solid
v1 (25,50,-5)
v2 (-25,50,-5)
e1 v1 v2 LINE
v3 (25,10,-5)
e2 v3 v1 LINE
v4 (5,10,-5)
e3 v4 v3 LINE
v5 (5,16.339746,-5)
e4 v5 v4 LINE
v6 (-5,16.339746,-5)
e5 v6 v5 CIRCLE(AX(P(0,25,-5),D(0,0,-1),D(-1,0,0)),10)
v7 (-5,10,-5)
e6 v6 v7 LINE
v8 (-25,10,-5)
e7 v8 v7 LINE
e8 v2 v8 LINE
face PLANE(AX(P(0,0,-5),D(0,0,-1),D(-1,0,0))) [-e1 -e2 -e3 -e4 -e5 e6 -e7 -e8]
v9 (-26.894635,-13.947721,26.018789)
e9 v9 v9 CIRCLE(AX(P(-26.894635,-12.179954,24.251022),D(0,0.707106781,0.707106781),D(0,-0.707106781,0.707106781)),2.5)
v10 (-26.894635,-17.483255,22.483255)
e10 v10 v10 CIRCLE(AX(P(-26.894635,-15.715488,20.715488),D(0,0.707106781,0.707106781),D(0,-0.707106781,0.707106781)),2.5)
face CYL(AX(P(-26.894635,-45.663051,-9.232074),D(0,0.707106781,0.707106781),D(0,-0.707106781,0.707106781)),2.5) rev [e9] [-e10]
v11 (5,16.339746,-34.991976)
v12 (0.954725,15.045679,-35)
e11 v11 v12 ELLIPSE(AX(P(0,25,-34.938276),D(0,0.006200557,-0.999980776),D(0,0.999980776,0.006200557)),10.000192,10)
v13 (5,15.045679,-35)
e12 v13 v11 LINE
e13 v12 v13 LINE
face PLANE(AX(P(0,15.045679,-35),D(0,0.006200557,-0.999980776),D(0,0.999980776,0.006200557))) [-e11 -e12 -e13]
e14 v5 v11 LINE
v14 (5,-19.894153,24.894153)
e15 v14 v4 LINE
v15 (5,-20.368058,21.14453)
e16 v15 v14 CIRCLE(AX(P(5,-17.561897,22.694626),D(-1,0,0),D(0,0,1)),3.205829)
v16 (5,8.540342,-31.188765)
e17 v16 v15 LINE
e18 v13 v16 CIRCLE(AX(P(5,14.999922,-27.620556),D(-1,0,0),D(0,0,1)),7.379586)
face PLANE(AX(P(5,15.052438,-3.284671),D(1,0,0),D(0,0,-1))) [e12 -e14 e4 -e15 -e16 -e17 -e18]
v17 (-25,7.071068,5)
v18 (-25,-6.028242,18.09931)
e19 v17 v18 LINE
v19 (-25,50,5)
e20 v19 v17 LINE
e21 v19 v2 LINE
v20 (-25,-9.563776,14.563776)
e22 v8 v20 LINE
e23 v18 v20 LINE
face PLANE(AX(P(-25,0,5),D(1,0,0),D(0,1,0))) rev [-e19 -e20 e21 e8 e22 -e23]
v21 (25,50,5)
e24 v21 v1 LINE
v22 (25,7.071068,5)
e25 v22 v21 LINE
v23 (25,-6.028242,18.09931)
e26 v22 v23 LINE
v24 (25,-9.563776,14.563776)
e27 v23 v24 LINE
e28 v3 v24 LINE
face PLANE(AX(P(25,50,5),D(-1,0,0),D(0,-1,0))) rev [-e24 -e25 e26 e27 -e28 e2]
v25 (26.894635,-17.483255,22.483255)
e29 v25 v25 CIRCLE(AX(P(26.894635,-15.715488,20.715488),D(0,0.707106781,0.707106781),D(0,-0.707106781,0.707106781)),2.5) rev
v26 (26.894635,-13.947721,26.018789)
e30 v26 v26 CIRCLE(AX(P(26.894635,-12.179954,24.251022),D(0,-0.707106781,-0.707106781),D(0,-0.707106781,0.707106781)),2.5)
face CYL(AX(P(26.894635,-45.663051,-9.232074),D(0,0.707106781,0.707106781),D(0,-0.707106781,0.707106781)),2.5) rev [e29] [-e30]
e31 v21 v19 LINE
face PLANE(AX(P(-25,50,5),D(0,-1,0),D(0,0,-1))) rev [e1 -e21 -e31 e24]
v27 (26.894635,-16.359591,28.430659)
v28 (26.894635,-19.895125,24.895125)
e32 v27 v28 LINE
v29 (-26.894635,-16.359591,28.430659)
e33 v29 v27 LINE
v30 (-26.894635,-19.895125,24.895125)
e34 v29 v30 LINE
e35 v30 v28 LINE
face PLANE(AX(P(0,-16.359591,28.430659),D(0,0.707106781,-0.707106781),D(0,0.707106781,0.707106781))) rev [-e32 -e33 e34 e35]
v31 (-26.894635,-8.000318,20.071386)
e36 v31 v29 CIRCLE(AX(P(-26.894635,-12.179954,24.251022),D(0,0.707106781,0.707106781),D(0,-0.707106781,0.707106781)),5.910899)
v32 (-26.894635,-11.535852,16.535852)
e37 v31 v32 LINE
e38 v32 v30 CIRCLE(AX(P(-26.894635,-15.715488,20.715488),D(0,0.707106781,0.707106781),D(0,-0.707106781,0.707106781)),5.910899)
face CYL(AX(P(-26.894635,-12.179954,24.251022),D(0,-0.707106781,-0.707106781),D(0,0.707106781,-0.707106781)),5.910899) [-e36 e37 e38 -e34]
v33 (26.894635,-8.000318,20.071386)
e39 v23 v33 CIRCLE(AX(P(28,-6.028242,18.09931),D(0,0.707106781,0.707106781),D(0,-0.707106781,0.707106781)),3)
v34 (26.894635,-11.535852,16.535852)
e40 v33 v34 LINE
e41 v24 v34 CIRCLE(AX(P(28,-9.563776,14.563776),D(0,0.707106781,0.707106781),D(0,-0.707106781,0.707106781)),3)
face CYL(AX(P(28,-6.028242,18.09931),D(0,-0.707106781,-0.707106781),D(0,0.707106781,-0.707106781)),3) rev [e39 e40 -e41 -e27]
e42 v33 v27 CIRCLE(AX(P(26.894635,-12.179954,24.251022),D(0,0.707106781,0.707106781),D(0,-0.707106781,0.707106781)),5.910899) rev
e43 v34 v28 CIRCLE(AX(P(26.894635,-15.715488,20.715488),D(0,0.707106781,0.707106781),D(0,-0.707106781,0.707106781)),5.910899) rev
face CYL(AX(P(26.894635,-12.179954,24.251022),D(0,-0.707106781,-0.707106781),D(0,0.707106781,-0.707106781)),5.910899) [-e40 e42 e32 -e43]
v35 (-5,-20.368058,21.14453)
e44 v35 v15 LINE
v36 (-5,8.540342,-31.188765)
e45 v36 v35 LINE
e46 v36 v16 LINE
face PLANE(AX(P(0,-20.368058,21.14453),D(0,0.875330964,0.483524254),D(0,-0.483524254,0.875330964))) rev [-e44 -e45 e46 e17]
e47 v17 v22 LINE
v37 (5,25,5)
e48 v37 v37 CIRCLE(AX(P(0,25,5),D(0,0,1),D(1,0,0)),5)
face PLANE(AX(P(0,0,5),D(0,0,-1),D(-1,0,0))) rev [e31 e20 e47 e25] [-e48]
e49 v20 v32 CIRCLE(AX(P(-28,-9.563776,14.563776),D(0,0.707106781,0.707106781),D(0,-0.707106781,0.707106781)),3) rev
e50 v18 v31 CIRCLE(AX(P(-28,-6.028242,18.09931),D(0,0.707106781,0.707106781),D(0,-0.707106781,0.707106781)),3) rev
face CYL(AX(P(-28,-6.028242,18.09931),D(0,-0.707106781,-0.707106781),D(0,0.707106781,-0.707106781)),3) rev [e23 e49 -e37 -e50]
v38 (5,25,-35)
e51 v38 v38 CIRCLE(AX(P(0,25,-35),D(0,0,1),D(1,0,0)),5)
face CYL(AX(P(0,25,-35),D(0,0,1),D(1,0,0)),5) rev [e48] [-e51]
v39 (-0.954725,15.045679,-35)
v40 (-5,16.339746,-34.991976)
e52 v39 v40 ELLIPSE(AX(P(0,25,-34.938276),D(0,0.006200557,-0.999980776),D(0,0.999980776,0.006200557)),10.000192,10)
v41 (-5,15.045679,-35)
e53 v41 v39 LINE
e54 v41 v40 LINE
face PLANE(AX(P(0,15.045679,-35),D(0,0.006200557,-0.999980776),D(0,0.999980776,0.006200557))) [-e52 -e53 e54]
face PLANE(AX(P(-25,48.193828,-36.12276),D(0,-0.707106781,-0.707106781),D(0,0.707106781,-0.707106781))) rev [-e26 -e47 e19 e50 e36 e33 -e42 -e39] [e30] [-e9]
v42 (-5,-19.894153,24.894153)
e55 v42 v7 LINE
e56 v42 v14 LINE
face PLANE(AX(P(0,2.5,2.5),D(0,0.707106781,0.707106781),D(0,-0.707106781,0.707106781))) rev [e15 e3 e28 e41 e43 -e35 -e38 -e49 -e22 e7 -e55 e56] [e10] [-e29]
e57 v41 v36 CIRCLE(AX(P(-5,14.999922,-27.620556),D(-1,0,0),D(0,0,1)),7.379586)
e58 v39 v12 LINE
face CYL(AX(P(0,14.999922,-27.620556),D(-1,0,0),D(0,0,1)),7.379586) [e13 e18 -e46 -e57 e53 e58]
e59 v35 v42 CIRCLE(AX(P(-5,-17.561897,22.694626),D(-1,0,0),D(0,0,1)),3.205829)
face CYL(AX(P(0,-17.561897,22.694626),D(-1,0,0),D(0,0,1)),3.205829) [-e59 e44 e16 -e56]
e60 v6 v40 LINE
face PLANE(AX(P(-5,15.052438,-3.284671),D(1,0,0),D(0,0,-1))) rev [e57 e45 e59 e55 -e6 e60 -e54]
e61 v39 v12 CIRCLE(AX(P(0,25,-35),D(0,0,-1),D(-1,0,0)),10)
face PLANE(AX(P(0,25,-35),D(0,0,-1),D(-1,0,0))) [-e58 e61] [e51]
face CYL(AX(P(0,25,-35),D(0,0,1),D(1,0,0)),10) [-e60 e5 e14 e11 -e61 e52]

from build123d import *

# Parameters (mm, degrees)
SCHIZZO1_W                   = 50
SCHIZZO1_H                   = 50
ESTRUSIONE_ESTRUSIONE1_DEPTH = 5
SCHIZZO2_R                   = 10
ESTRUSIONE_ESTRUSIONE2_DEPTH = 30
SCHIZZO3_R                   = 5
TAGLIO_ESTRUSIONE1_DEPTH     = 69.738635424
ESTRUSIONE_ESTRUSIONE6_DEPTH = 5
ESTRUSIONE_ESTRUSIONE7_REACH = 74.379
SCHIZZO9_W                   = 50
SCHIZZO9_H                   = 5
TAGLIO_ESTRUSIONE4_DEPTH     = 85.062355977
SCHIZZO12_R                  = 2.5
TAGLIO_ESTRUSIONE5_DEPTH     = 69.505418355
NERVATURA14_START            = -5
NERVATURA14_DEPTH            = 10


with BuildPart() as part:
    # Schizzo1 → Estrusione-Estrusione1 (new, symmetric)
    with BuildSketch(Plane.XY):
        with Locations((0, 25)):
            Rectangle(SCHIZZO1_W, SCHIZZO1_H)
    extrude(amount=ESTRUSIONE_ESTRUSIONE1_DEPTH, both=True)

    # Schizzo2 → Estrusione-Estrusione2 (add)
    with BuildSketch(Plane(origin=(0, 0, -5), x_dir=(-1, 0, 0), z_dir=(0, 0, -1))):
        with Locations((0, 25)):
            Circle(SCHIZZO2_R)
    extrude(amount=ESTRUSIONE_ESTRUSIONE2_DEPTH)

    # Schizzo3 → Taglio-Estrusione1 (cut, through all)
    with BuildSketch(Plane.XY.offset(5)):
        with Locations((0, 25)):
            Circle(SCHIZZO3_R)
    extrude(amount=-TAGLIO_ESTRUSIONE1_DEPTH, mode=Mode.SUBTRACT)

    # Estrusione-Estrusione7: up to this face of the body (flat: up to its plane)
    estrusione_estrusione7_end = Plane(part.part.faces().sort_by_distance((-24.292893219, 25, 5))[0])
    # Schizzo9 → Estrusione-Estrusione7 (add, up to the picked face)
    with BuildSketch(Plane(origin=(0, -2.5, 2.5), x_dir=(1, 0, 0), z_dir=(0, 0.7071067811865465, -0.7071067811865487)), mode=Mode.PRIVATE) as estrusione_estrusione7_sk1:
        with Locations((0, -6.035533906)):
            Rectangle(SCHIZZO9_W, SCHIZZO9_H)
    estrusione_estrusione7_tool1 = split(extrude(estrusione_estrusione7_sk1.sketch, amount=ESTRUSIONE_ESTRUSIONE7_REACH, mode=Mode.PRIVATE), bisect_by=estrusione_estrusione7_end, keep=Keep.BOTH, mode=Mode.PRIVATE)


with BuildPart() as body_2:
    # Schizzo4 → Estrusione-Estrusione6 (new body)
    with BuildSketch(Plane(origin=(0, 2.5, 2.5), x_dir=(1, 0, 0), z_dir=(0, 0.7071067811865488, 0.7071067811865464))):
        with BuildLine():
            ThreePointArc((-26.89463486, -19.849691999), (-32.805533406, -25.760590545), (-26.89463486, -31.67148909))
            Line((-26.89463486, -31.67148909), (0, -31.67148909))
            Line((0, -31.67148909), (0, -3.535533906))
            Line((0, -3.535533906), (-25, -3.535533906))
            Line((-25, -3.535533906), (-25, -17.060755301))
            ThreePointArc((-25, -17.060755301), (-25.518458602, -18.746564391), (-26.89463486, -19.849691999))
        make_face()
        with BuildLine():
            Line((0, -3.535533906), (0, -31.67148909))
            Line((0, -31.67148909), (26.89463486, -31.67148909))
            ThreePointArc((26.89463486, -31.67148909), (32.805533406, -25.760590545), (26.89463486, -19.849691999))
            ThreePointArc((26.89463486, -19.849691999), (25.518458602, -18.746564391), (25, -17.060755301))
            Line((25, -17.060755301), (25, -3.535533906))
            Line((25, -3.535533906), (0, -3.535533906))
        make_face()
    extrude(amount=ESTRUSIONE_ESTRUSIONE6_DEPTH)


with BuildPart() as part_1:
    add(part.part)

    add(body_2.part)  # Estrusione-Estrusione7 merges body 2
    add(estrusione_estrusione7_tool1.solids().sort_by(Axis((0, 1.767767, 6.767767), (0, 0.7071067811865465, -0.7071067811865487)))[0])

    # Schizzo11 → Taglio-Estrusione4 (cut, through all)
    with BuildSketch(Plane.ZY.offset(25)):
        Polygon((5, 0), (-5, 0), (-5, 10), align=None)
    extrude(amount=-TAGLIO_ESTRUSIONE4_DEPTH, mode=Mode.SUBTRACT)

    # Schizzo12 → Taglio-Estrusione5 (cut, through all)
    with BuildSketch(Plane(origin=(0, 6.035533906, 6.035533906), x_dir=(1, 0, 0), z_dir=(0, 0.7071067811865486, 0.7071067811865465))):
        with Locations(Location((-26.89463486, -25.760590545, 0), (0, 0, 270))):
            Circle(SCHIZZO12_R)
    taglio_estrusione5 = extrude(amount=-TAGLIO_ESTRUSIONE5_DEPTH, mode=Mode.SUBTRACT)

    # Specchia9: Taglio-Estrusione5 across plane
    add(taglio_estrusione5.mirror(Plane(origin=(0, 0, 0), x_dir=(0, 0, 1), z_dir=(1, 0, 0))), mode=Mode.SUBTRACT)

    # Nervatura14: read off the stored shape, not the designer's step
    # Nervatura14 outline → Nervatura14 (add)
    with BuildSketch(Plane(origin=(0, 0, 0), x_dir=(0, 0, -1), z_dir=(1, 0, 0)).offset(NERVATURA14_START)):
        with BuildLine():
            Line((35, 15.045679329), (34.991975911, 16.339745962))
            Line((34.991975911, 16.339745962), (5, 16.339745962))
            Line((5, 16.339745962), (5, 10))
            Line((5, 10), (-24.894153049, -19.894153049))
            ThreePointArc((-24.894153049, -19.894153049), (-23.096604523, -20.742423587), (-21.144530268, -20.368057844))
            Line((-21.144530268, -20.368057844), (31.188764864, 8.540341978))
            ThreePointArc((31.188764864, 8.540341978), (33.987865457, 11.269552189), (35, 15.045679329))
        make_face()
    extrude(amount=NERVATURA14_DEPTH)


solid = part_1.part
